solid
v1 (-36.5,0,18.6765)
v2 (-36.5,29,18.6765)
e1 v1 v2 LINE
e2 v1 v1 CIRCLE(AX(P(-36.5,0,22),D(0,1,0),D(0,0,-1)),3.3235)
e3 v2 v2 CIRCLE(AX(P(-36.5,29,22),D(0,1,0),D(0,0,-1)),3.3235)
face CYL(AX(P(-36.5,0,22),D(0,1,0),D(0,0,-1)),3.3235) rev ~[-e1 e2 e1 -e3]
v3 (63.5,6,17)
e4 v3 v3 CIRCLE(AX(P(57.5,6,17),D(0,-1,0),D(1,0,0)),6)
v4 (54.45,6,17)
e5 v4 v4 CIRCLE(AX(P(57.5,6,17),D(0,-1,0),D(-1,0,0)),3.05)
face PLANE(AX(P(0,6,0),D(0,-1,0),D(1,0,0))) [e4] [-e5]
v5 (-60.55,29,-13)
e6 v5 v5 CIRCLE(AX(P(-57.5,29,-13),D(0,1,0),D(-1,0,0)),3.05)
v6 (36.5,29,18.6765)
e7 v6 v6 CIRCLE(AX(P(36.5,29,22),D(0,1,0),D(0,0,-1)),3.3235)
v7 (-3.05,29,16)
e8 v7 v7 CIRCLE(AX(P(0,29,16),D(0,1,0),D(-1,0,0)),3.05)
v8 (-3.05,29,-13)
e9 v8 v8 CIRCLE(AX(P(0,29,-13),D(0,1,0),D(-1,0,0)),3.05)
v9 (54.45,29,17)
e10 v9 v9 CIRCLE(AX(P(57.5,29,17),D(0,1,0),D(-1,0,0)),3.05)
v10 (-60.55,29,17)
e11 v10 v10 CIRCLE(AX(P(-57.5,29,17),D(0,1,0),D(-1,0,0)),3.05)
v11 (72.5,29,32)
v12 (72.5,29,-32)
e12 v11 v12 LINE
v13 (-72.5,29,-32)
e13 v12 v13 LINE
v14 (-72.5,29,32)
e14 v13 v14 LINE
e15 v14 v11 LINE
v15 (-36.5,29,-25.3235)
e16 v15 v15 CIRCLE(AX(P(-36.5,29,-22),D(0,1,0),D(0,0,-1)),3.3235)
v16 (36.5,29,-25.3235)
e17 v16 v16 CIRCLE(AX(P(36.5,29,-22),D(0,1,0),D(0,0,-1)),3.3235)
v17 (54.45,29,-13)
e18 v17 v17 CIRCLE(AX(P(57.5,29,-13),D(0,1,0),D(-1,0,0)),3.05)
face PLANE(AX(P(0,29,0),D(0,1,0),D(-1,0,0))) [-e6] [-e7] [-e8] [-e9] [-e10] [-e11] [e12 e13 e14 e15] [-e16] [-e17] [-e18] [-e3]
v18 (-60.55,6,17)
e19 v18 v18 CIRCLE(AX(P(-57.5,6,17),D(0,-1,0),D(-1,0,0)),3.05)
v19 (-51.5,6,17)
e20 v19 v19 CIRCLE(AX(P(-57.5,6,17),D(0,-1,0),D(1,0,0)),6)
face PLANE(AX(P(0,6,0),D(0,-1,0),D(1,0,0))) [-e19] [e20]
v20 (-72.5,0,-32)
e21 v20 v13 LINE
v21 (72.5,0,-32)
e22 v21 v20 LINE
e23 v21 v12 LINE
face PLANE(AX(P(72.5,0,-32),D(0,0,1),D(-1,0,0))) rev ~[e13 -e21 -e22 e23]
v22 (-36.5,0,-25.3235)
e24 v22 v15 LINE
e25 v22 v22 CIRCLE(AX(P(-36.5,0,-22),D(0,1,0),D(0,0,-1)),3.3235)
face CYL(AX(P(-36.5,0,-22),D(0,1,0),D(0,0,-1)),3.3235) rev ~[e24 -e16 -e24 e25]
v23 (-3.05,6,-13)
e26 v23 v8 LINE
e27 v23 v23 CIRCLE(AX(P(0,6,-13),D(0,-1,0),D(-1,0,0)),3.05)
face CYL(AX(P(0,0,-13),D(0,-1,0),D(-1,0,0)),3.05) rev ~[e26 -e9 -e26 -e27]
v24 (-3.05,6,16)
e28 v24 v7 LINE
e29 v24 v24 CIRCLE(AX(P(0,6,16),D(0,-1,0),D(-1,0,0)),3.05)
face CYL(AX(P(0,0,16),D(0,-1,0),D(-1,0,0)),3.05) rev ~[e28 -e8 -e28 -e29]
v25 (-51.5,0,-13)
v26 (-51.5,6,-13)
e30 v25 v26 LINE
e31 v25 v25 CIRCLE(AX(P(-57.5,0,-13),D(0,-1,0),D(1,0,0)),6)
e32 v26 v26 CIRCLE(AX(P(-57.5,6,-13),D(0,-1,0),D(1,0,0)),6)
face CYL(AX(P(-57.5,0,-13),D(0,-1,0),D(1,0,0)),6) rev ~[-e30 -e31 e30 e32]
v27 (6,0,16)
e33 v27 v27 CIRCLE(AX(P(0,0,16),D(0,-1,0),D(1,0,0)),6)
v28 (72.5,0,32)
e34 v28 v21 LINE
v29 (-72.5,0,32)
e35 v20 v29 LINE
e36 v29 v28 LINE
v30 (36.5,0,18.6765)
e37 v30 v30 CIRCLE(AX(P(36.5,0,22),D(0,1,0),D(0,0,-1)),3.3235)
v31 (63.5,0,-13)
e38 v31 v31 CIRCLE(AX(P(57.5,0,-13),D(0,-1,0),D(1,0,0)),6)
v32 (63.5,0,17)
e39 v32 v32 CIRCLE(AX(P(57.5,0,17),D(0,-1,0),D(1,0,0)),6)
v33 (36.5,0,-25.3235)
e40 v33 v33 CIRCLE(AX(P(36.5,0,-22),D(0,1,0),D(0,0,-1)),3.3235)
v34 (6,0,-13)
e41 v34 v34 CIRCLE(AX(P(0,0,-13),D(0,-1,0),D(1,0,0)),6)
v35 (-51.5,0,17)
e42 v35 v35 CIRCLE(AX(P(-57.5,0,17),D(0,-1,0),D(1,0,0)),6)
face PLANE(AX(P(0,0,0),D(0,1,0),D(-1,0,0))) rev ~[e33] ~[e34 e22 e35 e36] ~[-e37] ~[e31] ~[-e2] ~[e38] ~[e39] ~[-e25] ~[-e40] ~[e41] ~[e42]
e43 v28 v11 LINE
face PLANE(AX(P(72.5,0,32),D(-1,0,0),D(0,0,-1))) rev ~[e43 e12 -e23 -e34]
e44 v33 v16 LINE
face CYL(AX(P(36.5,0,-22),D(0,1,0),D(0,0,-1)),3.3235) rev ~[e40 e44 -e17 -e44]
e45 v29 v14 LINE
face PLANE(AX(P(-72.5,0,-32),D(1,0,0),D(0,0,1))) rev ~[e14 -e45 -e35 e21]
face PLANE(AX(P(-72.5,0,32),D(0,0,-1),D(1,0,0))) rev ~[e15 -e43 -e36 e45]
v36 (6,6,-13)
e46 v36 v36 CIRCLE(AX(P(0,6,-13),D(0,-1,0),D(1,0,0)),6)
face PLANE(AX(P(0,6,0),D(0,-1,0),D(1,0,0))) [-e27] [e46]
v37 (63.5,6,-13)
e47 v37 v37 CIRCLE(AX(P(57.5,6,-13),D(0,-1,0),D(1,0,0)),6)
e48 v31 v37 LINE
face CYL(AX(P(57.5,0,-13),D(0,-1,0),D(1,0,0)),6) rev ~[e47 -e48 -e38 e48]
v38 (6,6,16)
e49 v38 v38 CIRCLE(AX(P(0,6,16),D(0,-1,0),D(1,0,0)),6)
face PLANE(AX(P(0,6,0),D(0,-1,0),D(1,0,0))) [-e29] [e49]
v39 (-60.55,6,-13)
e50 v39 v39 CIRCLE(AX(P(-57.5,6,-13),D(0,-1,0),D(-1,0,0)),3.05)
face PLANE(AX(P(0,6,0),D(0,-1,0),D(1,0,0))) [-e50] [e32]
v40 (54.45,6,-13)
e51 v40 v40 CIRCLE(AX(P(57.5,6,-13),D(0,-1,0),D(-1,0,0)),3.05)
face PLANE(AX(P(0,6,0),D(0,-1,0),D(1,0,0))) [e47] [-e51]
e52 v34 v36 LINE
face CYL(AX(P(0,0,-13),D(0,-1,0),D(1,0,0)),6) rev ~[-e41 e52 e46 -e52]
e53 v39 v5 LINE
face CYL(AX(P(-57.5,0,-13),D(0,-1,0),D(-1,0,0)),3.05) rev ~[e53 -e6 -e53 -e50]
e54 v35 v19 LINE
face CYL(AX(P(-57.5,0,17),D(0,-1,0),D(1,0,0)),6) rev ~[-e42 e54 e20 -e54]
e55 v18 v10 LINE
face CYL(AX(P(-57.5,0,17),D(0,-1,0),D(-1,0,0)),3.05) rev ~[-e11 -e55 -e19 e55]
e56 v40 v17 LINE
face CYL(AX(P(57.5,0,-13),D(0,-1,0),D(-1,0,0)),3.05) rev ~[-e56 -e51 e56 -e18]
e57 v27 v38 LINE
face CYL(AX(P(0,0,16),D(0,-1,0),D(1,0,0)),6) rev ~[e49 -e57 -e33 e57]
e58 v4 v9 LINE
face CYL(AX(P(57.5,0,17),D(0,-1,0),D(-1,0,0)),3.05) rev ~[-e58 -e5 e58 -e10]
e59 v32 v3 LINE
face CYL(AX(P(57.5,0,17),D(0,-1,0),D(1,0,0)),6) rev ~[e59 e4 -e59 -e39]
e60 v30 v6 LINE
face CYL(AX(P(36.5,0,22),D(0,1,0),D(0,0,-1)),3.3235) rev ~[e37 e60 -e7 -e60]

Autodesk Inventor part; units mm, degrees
ref_plane "YZ Plane" through (0, 0, 0) normal (1, 0, 0) x (0, 1, 0)
ref_plane "XZ Plane" through (0, 0, 0) normal (0, 1, 0) x (-1, 0, 0)
ref_plane "XY Plane" through (0, 0, 0) normal (0, 0, 1) x (1, 0, 0)
sketch "Sketch1" plane through (0, 0, 0) normal (0, 1, 0) x (-1, 0, 0)
  line L0 (72.5, 32) -> (-72.5, 32)
  line L1 (-72.5, 32) -> (-72.5, -32)
  line L2 (-72.5, -32) -> (72.5, -32)
  line L3 (72.5, -32) -> (72.5, 32)
  line L4 (72.5, 32) -> (-72.5, -32) construction
  line L5 (-72.5, 32) -> (72.5, -32) construction
  line L6 (0, 0) -> (0, -32) construction
  line L7 (0, 0) -> (0, 32) construction
  circle A0 centre (0, -13) radius 3.05
  circle A1 centre (0, 16) radius 3.05
  circle A2 centre (57.5, -13) radius 3.05
  circle A3 centre (57.5, 17) radius 3.05
  line L8 (57.5, -13) -> (57.5, 17) construction
  circle A4 centre (-57.5, -13) radius 3.05
  circle A5 centre (-57.5, 17) radius 3.05
  point P0 (57.5, 2)
  dimension "d0" = 145
  dimension "d1" = 64
  dimension "d2" = 6.1
  dimension "d3" = 6.1
  dimension "d4" = 15
  dimension "d5" = 30
  dimension "d18" = 2
extrude "Extrusion1" add sketch "Sketch1" along normal blind 29
sketch "Sketch2" plane through (0, 0, 0) normal (0, -1, 0) x (1, 0, 0)
  arc A0 (-35.5, 17.5) -> (-35.5, 26.5) centre (-35.5, 22) ccw projected
  line L0 (-37.5, 17.5) -> (-35.5, 17.5) projected
  arc A1 (-37.5, 26.5) -> (-37.5, 17.5) centre (-37.5, 22) ccw projected
  line L1 (-35.5, 26.5) -> (-37.5, 26.5) projected
  line L2 (-35.5, -17.5) -> (-37.5, -17.5) projected
  arc A2 (-35.5, -26.5) -> (-35.5, -17.5) centre (-35.5, -22) ccw projected
  line L3 (-37.5, -26.5) -> (-35.5, -26.5) projected
  arc A3 (-37.5, -17.5) -> (-37.5, -26.5) centre (-37.5, -22) ccw projected
  line L4 (35.5, -26.5) -> (37.5, -26.5) projected
  arc A4 (35.5, -17.5) -> (35.5, -26.5) centre (35.5, -22) ccw projected
  line L5 (37.5, -17.5) -> (35.5, -17.5) projected
  arc A5 (37.5, -26.5) -> (37.5, -17.5) centre (37.5, -22) ccw projected
  line L6 (37.5, 26.5) -> (35.5, 26.5) projected
  arc A6 (37.5, 17.5) -> (37.5, 26.5) centre (37.5, 22) ccw projected
  line L7 (35.5, 17.5) -> (37.5, 17.5) projected
  arc A7 (35.5, 26.5) -> (35.5, 17.5) centre (35.5, 22) ccw projected
  circle A8 centre (36.5, 0) radius 4.5 projected
  circle A9 centre (-36.5, 0) radius 4.5 projected
  line L8 (47, -32) -> (-47, -32) projected
  line L9 (47, 32) -> (47, -32) projected
  line L10 (-47, 32) -> (47, 32) projected
  line L11 (-47, -32) -> (-47, 32) projected
  circle A10 centre (0, 0) radius 20 projected
  line L12 (-37.5, -22) -> (-35.5, -22)
  line L13 (35.5, -22) -> (37.5, -22)
  line L14 (35.5, 22) -> (37.5, 22)
  line L15 (-37.5, 22) -> (-35.5, 22)
  point P0 (0, 0)
  point P1 (-36.5, -22)
  point P2 (-36.5, 22)
  point P3 (36.5, 22)
  point P4 (36.5, -22)
hole "Hole1" at (-36.5, 0, -22) at (-36.5, 0, 22) at (36.5, 0, 22) at (36.5, 0, -22) direction (0, 1, 0) diameter 6.647 end through all thread size "M8x1.25" class "6H" standard "ISO Metric profile"
sketch "Sketch4" plane through (0, 0, 0) normal (0, -1, 0) x (1, 0, 0)
  circle A0 centre (-57.5, 17) radius 3.05 projected
  circle A1 centre (-57.5, -13) radius 3.05 projected
  circle A2 centre (0, -13) radius 3.05 projected
  circle A3 centre (0, 16) radius 3.05 projected
  circle A4 centre (57.5, 17) radius 3.05 projected
  circle A5 centre (57.5, -13) radius 3.05 projected
  circle A6 centre (-57.5, 17) radius 6
  circle A7 centre (-57.5, -13) radius 6
  circle A8 centre (0, 16) radius 6
  circle A9 centre (0, -13) radius 6
  circle A10 centre (57.5, 17) radius 6
  circle A11 centre (57.5, -13) radius 6
  point P0 (0, 0)
  dimension "d15" = 12
extrude "Extrusion2" cut sketch "Sketch4" against normal blind 6 contours A0 | A1 | A2 | A3 | A4 | A5 | A6 | A7 | A8 | A9 | A10 | A11
properties part number "assist_wheel_bracket"
